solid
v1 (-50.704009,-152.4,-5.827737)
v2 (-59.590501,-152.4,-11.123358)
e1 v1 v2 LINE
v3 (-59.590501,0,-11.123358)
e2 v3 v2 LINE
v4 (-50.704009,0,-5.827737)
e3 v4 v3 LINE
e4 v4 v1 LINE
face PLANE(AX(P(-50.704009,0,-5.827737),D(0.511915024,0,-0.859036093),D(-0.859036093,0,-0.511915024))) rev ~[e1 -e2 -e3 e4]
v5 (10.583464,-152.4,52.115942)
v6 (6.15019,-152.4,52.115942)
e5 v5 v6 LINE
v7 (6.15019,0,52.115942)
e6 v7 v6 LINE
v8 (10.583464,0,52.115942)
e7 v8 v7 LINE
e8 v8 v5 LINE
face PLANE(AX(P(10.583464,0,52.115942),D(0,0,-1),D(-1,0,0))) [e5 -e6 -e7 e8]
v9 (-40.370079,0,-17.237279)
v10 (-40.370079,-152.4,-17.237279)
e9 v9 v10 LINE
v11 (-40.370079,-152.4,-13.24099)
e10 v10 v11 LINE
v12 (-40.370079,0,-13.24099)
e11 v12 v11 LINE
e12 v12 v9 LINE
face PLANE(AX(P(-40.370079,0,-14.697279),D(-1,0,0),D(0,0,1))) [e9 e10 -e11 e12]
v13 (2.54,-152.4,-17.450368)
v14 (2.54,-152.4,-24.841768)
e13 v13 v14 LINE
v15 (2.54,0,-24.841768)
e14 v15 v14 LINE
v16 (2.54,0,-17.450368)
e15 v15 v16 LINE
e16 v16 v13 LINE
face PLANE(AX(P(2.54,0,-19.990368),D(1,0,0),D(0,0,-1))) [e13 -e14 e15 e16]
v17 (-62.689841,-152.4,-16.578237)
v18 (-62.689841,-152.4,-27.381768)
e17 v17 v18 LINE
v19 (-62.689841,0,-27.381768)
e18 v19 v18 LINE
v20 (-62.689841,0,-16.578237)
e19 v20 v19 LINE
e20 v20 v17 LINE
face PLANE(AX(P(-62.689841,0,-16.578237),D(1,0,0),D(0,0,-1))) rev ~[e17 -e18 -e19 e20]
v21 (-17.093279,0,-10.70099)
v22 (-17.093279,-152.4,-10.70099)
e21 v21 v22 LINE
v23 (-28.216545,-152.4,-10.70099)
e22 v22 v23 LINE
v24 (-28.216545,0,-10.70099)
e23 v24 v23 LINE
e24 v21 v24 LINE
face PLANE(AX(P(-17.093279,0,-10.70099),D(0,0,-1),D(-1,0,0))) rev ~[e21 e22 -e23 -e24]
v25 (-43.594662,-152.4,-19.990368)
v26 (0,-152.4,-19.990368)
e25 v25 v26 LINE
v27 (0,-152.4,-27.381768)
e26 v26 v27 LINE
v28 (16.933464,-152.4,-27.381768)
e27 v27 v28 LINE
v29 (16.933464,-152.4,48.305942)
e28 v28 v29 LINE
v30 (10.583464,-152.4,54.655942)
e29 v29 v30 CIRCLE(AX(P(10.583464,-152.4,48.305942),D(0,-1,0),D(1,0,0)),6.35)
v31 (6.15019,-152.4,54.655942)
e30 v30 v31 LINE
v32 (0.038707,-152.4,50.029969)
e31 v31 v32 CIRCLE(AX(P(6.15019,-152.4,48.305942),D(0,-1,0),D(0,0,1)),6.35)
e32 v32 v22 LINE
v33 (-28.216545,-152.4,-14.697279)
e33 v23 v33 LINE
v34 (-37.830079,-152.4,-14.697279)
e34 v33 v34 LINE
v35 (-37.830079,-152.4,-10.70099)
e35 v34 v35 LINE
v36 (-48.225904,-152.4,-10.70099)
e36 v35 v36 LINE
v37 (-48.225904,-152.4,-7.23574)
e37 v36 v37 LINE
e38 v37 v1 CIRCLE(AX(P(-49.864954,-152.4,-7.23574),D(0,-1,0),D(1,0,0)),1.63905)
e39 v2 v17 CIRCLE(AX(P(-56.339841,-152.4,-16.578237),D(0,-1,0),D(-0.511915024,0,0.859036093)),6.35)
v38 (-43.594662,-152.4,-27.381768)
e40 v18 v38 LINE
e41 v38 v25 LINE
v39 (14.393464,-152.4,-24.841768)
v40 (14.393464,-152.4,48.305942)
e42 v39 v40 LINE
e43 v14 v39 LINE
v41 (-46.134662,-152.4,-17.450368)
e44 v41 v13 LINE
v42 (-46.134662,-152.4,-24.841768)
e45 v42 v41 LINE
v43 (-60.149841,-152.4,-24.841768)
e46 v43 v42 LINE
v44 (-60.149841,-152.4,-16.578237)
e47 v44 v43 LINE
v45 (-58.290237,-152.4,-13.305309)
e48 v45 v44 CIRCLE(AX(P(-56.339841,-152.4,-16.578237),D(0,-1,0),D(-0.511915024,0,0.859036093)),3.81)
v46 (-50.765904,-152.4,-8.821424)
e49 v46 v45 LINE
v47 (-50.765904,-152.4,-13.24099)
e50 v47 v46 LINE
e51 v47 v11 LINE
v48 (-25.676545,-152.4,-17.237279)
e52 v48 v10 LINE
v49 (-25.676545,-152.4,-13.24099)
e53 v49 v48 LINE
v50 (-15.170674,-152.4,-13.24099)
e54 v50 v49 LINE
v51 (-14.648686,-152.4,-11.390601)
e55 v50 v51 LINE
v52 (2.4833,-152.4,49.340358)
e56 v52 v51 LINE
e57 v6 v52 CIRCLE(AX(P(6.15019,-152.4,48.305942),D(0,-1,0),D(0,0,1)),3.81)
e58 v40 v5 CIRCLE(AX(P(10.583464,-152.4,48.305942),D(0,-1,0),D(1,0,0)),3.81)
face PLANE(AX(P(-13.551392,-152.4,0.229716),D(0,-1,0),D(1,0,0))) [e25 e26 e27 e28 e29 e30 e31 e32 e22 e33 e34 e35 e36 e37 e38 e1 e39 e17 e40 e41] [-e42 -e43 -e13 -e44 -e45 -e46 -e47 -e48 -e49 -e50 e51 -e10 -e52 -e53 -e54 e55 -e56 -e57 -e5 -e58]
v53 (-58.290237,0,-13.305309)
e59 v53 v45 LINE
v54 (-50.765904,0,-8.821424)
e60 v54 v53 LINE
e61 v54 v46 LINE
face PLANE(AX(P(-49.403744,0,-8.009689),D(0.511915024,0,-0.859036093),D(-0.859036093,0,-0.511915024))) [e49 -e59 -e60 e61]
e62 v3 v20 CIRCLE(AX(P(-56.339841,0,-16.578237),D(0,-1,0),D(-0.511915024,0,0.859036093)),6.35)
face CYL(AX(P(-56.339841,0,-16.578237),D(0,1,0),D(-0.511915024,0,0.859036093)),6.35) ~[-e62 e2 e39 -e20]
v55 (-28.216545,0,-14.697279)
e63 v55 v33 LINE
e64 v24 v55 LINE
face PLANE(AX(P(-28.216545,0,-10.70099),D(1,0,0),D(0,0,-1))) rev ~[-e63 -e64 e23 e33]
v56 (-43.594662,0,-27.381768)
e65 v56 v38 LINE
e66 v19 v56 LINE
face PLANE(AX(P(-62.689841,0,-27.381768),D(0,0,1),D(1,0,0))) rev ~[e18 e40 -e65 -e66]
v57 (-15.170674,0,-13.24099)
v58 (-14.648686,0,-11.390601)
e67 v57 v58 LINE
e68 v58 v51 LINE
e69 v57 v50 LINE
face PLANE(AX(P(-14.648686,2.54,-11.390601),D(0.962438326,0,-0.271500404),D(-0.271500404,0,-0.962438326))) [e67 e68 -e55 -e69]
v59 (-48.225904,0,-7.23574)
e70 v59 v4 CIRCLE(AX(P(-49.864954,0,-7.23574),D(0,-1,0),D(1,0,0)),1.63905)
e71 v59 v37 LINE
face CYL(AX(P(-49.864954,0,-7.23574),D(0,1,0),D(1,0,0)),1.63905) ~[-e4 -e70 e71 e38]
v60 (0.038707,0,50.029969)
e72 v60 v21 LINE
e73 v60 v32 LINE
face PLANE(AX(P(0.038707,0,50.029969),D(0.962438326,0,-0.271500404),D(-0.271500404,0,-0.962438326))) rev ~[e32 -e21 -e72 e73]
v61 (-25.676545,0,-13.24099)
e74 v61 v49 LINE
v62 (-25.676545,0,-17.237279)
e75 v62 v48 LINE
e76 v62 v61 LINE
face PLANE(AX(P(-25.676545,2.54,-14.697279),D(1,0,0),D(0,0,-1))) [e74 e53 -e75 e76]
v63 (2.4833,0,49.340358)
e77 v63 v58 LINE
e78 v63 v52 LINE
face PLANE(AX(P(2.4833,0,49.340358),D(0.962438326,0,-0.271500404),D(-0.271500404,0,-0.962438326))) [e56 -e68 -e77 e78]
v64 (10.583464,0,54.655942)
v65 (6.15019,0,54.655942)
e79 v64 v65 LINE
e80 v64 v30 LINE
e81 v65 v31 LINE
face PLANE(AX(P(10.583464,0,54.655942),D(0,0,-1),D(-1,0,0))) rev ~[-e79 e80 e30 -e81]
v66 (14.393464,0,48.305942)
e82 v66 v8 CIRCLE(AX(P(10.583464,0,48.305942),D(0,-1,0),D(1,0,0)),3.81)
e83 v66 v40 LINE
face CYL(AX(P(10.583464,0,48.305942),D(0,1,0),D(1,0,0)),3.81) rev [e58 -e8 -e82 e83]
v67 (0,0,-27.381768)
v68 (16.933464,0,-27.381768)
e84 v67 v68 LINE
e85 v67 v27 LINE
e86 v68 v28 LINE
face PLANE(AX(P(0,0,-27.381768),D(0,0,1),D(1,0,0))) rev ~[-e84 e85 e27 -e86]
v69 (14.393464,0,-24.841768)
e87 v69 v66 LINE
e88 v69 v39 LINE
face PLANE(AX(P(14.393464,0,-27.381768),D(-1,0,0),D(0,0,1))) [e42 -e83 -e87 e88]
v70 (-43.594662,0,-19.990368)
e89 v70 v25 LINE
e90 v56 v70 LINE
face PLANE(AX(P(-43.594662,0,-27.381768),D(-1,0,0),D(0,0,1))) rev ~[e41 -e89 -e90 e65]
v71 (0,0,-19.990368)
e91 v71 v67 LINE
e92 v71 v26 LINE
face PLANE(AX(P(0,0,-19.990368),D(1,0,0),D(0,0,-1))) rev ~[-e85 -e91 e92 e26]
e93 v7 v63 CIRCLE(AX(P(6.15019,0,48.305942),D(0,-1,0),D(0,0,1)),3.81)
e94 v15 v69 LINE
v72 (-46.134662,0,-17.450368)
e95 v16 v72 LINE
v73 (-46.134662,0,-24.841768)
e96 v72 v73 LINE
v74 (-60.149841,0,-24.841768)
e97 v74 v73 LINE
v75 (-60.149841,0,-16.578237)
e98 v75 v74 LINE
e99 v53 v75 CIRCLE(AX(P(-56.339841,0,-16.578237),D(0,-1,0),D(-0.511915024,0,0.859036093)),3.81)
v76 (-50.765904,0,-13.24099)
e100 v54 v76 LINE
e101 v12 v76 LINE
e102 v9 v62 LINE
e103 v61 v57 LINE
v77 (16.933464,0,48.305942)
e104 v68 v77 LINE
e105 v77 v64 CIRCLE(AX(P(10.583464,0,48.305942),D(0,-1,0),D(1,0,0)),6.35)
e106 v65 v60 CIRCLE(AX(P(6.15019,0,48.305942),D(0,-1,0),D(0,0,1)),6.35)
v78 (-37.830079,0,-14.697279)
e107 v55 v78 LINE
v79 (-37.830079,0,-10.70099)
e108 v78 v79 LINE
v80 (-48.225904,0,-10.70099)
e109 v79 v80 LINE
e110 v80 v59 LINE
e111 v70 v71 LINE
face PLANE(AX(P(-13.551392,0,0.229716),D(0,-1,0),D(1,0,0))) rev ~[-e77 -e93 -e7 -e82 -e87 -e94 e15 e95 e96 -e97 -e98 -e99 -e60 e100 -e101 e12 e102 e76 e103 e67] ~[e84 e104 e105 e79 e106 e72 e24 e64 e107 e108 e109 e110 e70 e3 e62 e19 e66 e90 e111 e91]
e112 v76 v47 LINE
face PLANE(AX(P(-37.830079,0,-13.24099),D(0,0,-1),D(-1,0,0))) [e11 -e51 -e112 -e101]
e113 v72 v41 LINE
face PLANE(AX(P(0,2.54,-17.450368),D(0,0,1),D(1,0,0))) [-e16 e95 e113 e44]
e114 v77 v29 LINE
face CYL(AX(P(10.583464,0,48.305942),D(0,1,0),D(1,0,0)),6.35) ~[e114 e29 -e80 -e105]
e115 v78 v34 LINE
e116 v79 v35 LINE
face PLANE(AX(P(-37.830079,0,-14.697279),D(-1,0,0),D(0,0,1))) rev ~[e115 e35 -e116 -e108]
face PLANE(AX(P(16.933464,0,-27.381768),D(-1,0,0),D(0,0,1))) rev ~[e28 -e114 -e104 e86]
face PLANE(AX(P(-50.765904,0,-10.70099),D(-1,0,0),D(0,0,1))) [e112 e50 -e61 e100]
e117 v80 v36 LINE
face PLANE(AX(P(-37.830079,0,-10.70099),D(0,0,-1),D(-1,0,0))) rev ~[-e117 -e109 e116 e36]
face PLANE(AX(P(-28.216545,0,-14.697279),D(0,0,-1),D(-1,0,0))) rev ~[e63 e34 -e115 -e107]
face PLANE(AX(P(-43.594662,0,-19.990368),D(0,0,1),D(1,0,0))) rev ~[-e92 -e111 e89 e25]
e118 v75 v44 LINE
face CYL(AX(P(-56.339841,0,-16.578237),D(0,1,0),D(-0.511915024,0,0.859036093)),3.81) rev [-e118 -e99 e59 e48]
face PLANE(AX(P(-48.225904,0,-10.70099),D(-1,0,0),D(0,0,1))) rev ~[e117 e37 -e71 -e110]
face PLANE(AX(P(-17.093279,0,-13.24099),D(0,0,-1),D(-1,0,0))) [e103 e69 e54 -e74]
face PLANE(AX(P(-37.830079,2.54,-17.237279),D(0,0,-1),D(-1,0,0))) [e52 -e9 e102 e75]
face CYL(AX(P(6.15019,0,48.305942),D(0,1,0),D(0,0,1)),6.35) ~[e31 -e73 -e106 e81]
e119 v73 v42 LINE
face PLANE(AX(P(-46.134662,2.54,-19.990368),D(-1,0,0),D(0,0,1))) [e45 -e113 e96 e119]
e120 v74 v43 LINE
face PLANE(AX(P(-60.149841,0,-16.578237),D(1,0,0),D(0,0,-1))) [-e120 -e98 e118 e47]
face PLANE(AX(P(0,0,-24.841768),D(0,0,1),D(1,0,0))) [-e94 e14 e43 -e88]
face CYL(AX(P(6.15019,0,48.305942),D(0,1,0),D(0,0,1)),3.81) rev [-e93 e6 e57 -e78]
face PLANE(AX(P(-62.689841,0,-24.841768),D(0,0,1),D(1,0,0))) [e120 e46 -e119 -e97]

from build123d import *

# Parameters (mm, degrees)
F1_DEPTH    = 152.4
F2_T        = 2.54
F2_T3_DEPTH = 157.48


# Not quite as in the source:
# - a shell that OpenCascade refuses in one call is made with other operations: the cavity is built on its own and cut out


with BuildPart() as f1:
    # F0 (on Front) → F1 (new body)
    with BuildSketch(Plane.XZ):
        with BuildLine():
            Line((-37.8300789744, -10.7009902054), (-48.2259040094, -10.7009902054))
            Line((-48.2259040094, -10.7009902054), (-48.2259040094, -7.2357404328))
            ThreePointArc((-48.2259040094, -7.2357404328), (-49.0552526275, -5.8106548767), (-50.7040085729, -5.8277371868))
            Line((-50.7040085729, -5.8277371868), (-59.5905011949, -11.123357617))
            ThreePointArc((-59.5905011949, -11.123357617), (-61.8609001823, -13.4412951055), (-62.6898407936, -16.578236805))
            Line((-62.6898407936, -16.578236805), (-62.6898407936, -27.3817684501))
            Line((-62.6898407936, -27.3817684501), (-43.5946621001, -27.3817684501))
            Line((-43.5946621001, -27.3817684501), (-43.5946621001, -19.9903684501))
            Line((-43.5946621001, -19.9903684501), (0, -19.9903684501))
            Line((0, -19.9903684501), (0, -27.3817684501))
            Line((0, -27.3817684501), (16.9334635139, -27.3817684501))
            Line((16.9334635139, -27.3817684501), (16.9334635139, 48.305941894))
            ThreePointArc((16.9334635139, 48.305941894), (15.0735915744, 52.7960699546), (10.5834635139, 54.655941894))
            Line((10.5834635139, 54.655941894), (6.1501904505, 54.655941894))
            ThreePointArc((6.1501904505, 54.655941894), (2.3177679163, 53.3690474153), (0.0387070827, 50.0299694591))
            Line((0.0387070827, 50.0299694591), (-17.0932790838, -10.7009902054))
            Line((-17.0932790838, -10.7009902054), (-28.2165445387, -10.7009902054))
            Line((-28.2165445387, -10.7009902054), (-28.2165445387, -14.6972788498))
            Line((-28.2165445387, -14.6972788498), (-37.8300789744, -14.6972788498))
            Line((-37.8300789744, -14.6972788498), (-37.8300789744, -10.7009902054))
        make_face()
    extrude(amount=F1_DEPTH)

    # F2: shell of thickness 2.54, made by hand


with BuildPart() as f2_core1:
    # F2_t2: copy of F1
    add(f1.part)

    # the walls: a layer under each face that stays
    f2_faces = [f2_core1.faces().sort_by_distance(p)[0] for p in [
        (-8.5272860005, -76.2, 19.6644896269),
        (-22.6549118113, -76.2, -10.7009902054),
        (-28.2165445387, -76.2, -12.6991345276),
        (-33.0233117566, -76.2, -14.6972788498),
        (-37.8300789744, -76.2, -12.6991345276),
        (-43.0279914919, -76.2, -10.7009902054),
        (-48.2259040094, -76.2, -8.9683653191),
        (-55.1472548839, -76.2, -8.4755474019),
        (-61.8609001823, -76.2, -13.4412951055),
        (-62.6898407936, -76.2, -21.9800026276),
        (-53.1422514468, -76.2, -27.3817684501),
        (-43.5946621001, -76.2, -23.6860684501),
        (-21.79733105, -76.2, -19.9903684501),
        (0, -76.2, -23.6860684501),
        (8.4667317569, -76.2, -27.3817684501),
        (16.9334635139, -76.2, 10.4620867219),
        (15.0735915744, -76.2, 52.7960699546),
        (8.3668269822, -76.2, 54.655941894),
        (2.3177679163, -76.2, 53.3690474153),
    ]]
    thicken(f2_faces, amount=-F2_T, mode=Mode.SUBTRACT)

    # F2_s4 → F2_t3 (cut)
    with BuildSketch(Plane.XZ.offset(-2.54)):
        Polygon((-17.1177250172, -10.6686940951), (-14.6486857366, -11.3906012314), (-15.1706738376, -13.2409902054), (-17.0932790838, -13.2409902054), align=None)
        Polygon((-28.2419445387, -14.6718788498), (-25.6765445387, -14.6972788498), (-25.6765445387, -17.2372788498), (-28.2165445387, -17.2372788498), align=None)
        Polygon((-37.8046789744, -14.6718788498), (-37.8300789744, -17.2372788498), (-40.3700789744, -17.2372788498), (-40.3700789744, -14.6972788498), align=None)
        Polygon((-48.2005040094, -10.6755902054), (-48.2259040094, -13.2409902054), (-50.7659040094, -13.2409902054), (-50.7659040094, -10.7009902054), align=None)
        Polygon((-43.5692621001, -20.0157684501), (-46.1346621001, -19.9903684501), (-46.1346621001, -17.4503684501), (-43.5946621001, -17.4503684501), align=None)
        Polygon((-0.0254, -20.0157684501), (0, -17.4503684501), (2.54, -17.4503684501), (2.54, -19.9903684501), align=None)
    extrude(amount=F2_T3_DEPTH, mode=Mode.SUBTRACT)


with BuildPart() as f1_1:
    add(f1.part)

    # what is left inside the walls is the cavity
    f2_cavity = [f2_core1.part.solids().sort_by_distance(p)[0] for p in [
        (14.368064, -101.6, 11.732087),
    ]]
    add(f2_cavity, mode=Mode.SUBTRACT)


solid = f1_1.part
